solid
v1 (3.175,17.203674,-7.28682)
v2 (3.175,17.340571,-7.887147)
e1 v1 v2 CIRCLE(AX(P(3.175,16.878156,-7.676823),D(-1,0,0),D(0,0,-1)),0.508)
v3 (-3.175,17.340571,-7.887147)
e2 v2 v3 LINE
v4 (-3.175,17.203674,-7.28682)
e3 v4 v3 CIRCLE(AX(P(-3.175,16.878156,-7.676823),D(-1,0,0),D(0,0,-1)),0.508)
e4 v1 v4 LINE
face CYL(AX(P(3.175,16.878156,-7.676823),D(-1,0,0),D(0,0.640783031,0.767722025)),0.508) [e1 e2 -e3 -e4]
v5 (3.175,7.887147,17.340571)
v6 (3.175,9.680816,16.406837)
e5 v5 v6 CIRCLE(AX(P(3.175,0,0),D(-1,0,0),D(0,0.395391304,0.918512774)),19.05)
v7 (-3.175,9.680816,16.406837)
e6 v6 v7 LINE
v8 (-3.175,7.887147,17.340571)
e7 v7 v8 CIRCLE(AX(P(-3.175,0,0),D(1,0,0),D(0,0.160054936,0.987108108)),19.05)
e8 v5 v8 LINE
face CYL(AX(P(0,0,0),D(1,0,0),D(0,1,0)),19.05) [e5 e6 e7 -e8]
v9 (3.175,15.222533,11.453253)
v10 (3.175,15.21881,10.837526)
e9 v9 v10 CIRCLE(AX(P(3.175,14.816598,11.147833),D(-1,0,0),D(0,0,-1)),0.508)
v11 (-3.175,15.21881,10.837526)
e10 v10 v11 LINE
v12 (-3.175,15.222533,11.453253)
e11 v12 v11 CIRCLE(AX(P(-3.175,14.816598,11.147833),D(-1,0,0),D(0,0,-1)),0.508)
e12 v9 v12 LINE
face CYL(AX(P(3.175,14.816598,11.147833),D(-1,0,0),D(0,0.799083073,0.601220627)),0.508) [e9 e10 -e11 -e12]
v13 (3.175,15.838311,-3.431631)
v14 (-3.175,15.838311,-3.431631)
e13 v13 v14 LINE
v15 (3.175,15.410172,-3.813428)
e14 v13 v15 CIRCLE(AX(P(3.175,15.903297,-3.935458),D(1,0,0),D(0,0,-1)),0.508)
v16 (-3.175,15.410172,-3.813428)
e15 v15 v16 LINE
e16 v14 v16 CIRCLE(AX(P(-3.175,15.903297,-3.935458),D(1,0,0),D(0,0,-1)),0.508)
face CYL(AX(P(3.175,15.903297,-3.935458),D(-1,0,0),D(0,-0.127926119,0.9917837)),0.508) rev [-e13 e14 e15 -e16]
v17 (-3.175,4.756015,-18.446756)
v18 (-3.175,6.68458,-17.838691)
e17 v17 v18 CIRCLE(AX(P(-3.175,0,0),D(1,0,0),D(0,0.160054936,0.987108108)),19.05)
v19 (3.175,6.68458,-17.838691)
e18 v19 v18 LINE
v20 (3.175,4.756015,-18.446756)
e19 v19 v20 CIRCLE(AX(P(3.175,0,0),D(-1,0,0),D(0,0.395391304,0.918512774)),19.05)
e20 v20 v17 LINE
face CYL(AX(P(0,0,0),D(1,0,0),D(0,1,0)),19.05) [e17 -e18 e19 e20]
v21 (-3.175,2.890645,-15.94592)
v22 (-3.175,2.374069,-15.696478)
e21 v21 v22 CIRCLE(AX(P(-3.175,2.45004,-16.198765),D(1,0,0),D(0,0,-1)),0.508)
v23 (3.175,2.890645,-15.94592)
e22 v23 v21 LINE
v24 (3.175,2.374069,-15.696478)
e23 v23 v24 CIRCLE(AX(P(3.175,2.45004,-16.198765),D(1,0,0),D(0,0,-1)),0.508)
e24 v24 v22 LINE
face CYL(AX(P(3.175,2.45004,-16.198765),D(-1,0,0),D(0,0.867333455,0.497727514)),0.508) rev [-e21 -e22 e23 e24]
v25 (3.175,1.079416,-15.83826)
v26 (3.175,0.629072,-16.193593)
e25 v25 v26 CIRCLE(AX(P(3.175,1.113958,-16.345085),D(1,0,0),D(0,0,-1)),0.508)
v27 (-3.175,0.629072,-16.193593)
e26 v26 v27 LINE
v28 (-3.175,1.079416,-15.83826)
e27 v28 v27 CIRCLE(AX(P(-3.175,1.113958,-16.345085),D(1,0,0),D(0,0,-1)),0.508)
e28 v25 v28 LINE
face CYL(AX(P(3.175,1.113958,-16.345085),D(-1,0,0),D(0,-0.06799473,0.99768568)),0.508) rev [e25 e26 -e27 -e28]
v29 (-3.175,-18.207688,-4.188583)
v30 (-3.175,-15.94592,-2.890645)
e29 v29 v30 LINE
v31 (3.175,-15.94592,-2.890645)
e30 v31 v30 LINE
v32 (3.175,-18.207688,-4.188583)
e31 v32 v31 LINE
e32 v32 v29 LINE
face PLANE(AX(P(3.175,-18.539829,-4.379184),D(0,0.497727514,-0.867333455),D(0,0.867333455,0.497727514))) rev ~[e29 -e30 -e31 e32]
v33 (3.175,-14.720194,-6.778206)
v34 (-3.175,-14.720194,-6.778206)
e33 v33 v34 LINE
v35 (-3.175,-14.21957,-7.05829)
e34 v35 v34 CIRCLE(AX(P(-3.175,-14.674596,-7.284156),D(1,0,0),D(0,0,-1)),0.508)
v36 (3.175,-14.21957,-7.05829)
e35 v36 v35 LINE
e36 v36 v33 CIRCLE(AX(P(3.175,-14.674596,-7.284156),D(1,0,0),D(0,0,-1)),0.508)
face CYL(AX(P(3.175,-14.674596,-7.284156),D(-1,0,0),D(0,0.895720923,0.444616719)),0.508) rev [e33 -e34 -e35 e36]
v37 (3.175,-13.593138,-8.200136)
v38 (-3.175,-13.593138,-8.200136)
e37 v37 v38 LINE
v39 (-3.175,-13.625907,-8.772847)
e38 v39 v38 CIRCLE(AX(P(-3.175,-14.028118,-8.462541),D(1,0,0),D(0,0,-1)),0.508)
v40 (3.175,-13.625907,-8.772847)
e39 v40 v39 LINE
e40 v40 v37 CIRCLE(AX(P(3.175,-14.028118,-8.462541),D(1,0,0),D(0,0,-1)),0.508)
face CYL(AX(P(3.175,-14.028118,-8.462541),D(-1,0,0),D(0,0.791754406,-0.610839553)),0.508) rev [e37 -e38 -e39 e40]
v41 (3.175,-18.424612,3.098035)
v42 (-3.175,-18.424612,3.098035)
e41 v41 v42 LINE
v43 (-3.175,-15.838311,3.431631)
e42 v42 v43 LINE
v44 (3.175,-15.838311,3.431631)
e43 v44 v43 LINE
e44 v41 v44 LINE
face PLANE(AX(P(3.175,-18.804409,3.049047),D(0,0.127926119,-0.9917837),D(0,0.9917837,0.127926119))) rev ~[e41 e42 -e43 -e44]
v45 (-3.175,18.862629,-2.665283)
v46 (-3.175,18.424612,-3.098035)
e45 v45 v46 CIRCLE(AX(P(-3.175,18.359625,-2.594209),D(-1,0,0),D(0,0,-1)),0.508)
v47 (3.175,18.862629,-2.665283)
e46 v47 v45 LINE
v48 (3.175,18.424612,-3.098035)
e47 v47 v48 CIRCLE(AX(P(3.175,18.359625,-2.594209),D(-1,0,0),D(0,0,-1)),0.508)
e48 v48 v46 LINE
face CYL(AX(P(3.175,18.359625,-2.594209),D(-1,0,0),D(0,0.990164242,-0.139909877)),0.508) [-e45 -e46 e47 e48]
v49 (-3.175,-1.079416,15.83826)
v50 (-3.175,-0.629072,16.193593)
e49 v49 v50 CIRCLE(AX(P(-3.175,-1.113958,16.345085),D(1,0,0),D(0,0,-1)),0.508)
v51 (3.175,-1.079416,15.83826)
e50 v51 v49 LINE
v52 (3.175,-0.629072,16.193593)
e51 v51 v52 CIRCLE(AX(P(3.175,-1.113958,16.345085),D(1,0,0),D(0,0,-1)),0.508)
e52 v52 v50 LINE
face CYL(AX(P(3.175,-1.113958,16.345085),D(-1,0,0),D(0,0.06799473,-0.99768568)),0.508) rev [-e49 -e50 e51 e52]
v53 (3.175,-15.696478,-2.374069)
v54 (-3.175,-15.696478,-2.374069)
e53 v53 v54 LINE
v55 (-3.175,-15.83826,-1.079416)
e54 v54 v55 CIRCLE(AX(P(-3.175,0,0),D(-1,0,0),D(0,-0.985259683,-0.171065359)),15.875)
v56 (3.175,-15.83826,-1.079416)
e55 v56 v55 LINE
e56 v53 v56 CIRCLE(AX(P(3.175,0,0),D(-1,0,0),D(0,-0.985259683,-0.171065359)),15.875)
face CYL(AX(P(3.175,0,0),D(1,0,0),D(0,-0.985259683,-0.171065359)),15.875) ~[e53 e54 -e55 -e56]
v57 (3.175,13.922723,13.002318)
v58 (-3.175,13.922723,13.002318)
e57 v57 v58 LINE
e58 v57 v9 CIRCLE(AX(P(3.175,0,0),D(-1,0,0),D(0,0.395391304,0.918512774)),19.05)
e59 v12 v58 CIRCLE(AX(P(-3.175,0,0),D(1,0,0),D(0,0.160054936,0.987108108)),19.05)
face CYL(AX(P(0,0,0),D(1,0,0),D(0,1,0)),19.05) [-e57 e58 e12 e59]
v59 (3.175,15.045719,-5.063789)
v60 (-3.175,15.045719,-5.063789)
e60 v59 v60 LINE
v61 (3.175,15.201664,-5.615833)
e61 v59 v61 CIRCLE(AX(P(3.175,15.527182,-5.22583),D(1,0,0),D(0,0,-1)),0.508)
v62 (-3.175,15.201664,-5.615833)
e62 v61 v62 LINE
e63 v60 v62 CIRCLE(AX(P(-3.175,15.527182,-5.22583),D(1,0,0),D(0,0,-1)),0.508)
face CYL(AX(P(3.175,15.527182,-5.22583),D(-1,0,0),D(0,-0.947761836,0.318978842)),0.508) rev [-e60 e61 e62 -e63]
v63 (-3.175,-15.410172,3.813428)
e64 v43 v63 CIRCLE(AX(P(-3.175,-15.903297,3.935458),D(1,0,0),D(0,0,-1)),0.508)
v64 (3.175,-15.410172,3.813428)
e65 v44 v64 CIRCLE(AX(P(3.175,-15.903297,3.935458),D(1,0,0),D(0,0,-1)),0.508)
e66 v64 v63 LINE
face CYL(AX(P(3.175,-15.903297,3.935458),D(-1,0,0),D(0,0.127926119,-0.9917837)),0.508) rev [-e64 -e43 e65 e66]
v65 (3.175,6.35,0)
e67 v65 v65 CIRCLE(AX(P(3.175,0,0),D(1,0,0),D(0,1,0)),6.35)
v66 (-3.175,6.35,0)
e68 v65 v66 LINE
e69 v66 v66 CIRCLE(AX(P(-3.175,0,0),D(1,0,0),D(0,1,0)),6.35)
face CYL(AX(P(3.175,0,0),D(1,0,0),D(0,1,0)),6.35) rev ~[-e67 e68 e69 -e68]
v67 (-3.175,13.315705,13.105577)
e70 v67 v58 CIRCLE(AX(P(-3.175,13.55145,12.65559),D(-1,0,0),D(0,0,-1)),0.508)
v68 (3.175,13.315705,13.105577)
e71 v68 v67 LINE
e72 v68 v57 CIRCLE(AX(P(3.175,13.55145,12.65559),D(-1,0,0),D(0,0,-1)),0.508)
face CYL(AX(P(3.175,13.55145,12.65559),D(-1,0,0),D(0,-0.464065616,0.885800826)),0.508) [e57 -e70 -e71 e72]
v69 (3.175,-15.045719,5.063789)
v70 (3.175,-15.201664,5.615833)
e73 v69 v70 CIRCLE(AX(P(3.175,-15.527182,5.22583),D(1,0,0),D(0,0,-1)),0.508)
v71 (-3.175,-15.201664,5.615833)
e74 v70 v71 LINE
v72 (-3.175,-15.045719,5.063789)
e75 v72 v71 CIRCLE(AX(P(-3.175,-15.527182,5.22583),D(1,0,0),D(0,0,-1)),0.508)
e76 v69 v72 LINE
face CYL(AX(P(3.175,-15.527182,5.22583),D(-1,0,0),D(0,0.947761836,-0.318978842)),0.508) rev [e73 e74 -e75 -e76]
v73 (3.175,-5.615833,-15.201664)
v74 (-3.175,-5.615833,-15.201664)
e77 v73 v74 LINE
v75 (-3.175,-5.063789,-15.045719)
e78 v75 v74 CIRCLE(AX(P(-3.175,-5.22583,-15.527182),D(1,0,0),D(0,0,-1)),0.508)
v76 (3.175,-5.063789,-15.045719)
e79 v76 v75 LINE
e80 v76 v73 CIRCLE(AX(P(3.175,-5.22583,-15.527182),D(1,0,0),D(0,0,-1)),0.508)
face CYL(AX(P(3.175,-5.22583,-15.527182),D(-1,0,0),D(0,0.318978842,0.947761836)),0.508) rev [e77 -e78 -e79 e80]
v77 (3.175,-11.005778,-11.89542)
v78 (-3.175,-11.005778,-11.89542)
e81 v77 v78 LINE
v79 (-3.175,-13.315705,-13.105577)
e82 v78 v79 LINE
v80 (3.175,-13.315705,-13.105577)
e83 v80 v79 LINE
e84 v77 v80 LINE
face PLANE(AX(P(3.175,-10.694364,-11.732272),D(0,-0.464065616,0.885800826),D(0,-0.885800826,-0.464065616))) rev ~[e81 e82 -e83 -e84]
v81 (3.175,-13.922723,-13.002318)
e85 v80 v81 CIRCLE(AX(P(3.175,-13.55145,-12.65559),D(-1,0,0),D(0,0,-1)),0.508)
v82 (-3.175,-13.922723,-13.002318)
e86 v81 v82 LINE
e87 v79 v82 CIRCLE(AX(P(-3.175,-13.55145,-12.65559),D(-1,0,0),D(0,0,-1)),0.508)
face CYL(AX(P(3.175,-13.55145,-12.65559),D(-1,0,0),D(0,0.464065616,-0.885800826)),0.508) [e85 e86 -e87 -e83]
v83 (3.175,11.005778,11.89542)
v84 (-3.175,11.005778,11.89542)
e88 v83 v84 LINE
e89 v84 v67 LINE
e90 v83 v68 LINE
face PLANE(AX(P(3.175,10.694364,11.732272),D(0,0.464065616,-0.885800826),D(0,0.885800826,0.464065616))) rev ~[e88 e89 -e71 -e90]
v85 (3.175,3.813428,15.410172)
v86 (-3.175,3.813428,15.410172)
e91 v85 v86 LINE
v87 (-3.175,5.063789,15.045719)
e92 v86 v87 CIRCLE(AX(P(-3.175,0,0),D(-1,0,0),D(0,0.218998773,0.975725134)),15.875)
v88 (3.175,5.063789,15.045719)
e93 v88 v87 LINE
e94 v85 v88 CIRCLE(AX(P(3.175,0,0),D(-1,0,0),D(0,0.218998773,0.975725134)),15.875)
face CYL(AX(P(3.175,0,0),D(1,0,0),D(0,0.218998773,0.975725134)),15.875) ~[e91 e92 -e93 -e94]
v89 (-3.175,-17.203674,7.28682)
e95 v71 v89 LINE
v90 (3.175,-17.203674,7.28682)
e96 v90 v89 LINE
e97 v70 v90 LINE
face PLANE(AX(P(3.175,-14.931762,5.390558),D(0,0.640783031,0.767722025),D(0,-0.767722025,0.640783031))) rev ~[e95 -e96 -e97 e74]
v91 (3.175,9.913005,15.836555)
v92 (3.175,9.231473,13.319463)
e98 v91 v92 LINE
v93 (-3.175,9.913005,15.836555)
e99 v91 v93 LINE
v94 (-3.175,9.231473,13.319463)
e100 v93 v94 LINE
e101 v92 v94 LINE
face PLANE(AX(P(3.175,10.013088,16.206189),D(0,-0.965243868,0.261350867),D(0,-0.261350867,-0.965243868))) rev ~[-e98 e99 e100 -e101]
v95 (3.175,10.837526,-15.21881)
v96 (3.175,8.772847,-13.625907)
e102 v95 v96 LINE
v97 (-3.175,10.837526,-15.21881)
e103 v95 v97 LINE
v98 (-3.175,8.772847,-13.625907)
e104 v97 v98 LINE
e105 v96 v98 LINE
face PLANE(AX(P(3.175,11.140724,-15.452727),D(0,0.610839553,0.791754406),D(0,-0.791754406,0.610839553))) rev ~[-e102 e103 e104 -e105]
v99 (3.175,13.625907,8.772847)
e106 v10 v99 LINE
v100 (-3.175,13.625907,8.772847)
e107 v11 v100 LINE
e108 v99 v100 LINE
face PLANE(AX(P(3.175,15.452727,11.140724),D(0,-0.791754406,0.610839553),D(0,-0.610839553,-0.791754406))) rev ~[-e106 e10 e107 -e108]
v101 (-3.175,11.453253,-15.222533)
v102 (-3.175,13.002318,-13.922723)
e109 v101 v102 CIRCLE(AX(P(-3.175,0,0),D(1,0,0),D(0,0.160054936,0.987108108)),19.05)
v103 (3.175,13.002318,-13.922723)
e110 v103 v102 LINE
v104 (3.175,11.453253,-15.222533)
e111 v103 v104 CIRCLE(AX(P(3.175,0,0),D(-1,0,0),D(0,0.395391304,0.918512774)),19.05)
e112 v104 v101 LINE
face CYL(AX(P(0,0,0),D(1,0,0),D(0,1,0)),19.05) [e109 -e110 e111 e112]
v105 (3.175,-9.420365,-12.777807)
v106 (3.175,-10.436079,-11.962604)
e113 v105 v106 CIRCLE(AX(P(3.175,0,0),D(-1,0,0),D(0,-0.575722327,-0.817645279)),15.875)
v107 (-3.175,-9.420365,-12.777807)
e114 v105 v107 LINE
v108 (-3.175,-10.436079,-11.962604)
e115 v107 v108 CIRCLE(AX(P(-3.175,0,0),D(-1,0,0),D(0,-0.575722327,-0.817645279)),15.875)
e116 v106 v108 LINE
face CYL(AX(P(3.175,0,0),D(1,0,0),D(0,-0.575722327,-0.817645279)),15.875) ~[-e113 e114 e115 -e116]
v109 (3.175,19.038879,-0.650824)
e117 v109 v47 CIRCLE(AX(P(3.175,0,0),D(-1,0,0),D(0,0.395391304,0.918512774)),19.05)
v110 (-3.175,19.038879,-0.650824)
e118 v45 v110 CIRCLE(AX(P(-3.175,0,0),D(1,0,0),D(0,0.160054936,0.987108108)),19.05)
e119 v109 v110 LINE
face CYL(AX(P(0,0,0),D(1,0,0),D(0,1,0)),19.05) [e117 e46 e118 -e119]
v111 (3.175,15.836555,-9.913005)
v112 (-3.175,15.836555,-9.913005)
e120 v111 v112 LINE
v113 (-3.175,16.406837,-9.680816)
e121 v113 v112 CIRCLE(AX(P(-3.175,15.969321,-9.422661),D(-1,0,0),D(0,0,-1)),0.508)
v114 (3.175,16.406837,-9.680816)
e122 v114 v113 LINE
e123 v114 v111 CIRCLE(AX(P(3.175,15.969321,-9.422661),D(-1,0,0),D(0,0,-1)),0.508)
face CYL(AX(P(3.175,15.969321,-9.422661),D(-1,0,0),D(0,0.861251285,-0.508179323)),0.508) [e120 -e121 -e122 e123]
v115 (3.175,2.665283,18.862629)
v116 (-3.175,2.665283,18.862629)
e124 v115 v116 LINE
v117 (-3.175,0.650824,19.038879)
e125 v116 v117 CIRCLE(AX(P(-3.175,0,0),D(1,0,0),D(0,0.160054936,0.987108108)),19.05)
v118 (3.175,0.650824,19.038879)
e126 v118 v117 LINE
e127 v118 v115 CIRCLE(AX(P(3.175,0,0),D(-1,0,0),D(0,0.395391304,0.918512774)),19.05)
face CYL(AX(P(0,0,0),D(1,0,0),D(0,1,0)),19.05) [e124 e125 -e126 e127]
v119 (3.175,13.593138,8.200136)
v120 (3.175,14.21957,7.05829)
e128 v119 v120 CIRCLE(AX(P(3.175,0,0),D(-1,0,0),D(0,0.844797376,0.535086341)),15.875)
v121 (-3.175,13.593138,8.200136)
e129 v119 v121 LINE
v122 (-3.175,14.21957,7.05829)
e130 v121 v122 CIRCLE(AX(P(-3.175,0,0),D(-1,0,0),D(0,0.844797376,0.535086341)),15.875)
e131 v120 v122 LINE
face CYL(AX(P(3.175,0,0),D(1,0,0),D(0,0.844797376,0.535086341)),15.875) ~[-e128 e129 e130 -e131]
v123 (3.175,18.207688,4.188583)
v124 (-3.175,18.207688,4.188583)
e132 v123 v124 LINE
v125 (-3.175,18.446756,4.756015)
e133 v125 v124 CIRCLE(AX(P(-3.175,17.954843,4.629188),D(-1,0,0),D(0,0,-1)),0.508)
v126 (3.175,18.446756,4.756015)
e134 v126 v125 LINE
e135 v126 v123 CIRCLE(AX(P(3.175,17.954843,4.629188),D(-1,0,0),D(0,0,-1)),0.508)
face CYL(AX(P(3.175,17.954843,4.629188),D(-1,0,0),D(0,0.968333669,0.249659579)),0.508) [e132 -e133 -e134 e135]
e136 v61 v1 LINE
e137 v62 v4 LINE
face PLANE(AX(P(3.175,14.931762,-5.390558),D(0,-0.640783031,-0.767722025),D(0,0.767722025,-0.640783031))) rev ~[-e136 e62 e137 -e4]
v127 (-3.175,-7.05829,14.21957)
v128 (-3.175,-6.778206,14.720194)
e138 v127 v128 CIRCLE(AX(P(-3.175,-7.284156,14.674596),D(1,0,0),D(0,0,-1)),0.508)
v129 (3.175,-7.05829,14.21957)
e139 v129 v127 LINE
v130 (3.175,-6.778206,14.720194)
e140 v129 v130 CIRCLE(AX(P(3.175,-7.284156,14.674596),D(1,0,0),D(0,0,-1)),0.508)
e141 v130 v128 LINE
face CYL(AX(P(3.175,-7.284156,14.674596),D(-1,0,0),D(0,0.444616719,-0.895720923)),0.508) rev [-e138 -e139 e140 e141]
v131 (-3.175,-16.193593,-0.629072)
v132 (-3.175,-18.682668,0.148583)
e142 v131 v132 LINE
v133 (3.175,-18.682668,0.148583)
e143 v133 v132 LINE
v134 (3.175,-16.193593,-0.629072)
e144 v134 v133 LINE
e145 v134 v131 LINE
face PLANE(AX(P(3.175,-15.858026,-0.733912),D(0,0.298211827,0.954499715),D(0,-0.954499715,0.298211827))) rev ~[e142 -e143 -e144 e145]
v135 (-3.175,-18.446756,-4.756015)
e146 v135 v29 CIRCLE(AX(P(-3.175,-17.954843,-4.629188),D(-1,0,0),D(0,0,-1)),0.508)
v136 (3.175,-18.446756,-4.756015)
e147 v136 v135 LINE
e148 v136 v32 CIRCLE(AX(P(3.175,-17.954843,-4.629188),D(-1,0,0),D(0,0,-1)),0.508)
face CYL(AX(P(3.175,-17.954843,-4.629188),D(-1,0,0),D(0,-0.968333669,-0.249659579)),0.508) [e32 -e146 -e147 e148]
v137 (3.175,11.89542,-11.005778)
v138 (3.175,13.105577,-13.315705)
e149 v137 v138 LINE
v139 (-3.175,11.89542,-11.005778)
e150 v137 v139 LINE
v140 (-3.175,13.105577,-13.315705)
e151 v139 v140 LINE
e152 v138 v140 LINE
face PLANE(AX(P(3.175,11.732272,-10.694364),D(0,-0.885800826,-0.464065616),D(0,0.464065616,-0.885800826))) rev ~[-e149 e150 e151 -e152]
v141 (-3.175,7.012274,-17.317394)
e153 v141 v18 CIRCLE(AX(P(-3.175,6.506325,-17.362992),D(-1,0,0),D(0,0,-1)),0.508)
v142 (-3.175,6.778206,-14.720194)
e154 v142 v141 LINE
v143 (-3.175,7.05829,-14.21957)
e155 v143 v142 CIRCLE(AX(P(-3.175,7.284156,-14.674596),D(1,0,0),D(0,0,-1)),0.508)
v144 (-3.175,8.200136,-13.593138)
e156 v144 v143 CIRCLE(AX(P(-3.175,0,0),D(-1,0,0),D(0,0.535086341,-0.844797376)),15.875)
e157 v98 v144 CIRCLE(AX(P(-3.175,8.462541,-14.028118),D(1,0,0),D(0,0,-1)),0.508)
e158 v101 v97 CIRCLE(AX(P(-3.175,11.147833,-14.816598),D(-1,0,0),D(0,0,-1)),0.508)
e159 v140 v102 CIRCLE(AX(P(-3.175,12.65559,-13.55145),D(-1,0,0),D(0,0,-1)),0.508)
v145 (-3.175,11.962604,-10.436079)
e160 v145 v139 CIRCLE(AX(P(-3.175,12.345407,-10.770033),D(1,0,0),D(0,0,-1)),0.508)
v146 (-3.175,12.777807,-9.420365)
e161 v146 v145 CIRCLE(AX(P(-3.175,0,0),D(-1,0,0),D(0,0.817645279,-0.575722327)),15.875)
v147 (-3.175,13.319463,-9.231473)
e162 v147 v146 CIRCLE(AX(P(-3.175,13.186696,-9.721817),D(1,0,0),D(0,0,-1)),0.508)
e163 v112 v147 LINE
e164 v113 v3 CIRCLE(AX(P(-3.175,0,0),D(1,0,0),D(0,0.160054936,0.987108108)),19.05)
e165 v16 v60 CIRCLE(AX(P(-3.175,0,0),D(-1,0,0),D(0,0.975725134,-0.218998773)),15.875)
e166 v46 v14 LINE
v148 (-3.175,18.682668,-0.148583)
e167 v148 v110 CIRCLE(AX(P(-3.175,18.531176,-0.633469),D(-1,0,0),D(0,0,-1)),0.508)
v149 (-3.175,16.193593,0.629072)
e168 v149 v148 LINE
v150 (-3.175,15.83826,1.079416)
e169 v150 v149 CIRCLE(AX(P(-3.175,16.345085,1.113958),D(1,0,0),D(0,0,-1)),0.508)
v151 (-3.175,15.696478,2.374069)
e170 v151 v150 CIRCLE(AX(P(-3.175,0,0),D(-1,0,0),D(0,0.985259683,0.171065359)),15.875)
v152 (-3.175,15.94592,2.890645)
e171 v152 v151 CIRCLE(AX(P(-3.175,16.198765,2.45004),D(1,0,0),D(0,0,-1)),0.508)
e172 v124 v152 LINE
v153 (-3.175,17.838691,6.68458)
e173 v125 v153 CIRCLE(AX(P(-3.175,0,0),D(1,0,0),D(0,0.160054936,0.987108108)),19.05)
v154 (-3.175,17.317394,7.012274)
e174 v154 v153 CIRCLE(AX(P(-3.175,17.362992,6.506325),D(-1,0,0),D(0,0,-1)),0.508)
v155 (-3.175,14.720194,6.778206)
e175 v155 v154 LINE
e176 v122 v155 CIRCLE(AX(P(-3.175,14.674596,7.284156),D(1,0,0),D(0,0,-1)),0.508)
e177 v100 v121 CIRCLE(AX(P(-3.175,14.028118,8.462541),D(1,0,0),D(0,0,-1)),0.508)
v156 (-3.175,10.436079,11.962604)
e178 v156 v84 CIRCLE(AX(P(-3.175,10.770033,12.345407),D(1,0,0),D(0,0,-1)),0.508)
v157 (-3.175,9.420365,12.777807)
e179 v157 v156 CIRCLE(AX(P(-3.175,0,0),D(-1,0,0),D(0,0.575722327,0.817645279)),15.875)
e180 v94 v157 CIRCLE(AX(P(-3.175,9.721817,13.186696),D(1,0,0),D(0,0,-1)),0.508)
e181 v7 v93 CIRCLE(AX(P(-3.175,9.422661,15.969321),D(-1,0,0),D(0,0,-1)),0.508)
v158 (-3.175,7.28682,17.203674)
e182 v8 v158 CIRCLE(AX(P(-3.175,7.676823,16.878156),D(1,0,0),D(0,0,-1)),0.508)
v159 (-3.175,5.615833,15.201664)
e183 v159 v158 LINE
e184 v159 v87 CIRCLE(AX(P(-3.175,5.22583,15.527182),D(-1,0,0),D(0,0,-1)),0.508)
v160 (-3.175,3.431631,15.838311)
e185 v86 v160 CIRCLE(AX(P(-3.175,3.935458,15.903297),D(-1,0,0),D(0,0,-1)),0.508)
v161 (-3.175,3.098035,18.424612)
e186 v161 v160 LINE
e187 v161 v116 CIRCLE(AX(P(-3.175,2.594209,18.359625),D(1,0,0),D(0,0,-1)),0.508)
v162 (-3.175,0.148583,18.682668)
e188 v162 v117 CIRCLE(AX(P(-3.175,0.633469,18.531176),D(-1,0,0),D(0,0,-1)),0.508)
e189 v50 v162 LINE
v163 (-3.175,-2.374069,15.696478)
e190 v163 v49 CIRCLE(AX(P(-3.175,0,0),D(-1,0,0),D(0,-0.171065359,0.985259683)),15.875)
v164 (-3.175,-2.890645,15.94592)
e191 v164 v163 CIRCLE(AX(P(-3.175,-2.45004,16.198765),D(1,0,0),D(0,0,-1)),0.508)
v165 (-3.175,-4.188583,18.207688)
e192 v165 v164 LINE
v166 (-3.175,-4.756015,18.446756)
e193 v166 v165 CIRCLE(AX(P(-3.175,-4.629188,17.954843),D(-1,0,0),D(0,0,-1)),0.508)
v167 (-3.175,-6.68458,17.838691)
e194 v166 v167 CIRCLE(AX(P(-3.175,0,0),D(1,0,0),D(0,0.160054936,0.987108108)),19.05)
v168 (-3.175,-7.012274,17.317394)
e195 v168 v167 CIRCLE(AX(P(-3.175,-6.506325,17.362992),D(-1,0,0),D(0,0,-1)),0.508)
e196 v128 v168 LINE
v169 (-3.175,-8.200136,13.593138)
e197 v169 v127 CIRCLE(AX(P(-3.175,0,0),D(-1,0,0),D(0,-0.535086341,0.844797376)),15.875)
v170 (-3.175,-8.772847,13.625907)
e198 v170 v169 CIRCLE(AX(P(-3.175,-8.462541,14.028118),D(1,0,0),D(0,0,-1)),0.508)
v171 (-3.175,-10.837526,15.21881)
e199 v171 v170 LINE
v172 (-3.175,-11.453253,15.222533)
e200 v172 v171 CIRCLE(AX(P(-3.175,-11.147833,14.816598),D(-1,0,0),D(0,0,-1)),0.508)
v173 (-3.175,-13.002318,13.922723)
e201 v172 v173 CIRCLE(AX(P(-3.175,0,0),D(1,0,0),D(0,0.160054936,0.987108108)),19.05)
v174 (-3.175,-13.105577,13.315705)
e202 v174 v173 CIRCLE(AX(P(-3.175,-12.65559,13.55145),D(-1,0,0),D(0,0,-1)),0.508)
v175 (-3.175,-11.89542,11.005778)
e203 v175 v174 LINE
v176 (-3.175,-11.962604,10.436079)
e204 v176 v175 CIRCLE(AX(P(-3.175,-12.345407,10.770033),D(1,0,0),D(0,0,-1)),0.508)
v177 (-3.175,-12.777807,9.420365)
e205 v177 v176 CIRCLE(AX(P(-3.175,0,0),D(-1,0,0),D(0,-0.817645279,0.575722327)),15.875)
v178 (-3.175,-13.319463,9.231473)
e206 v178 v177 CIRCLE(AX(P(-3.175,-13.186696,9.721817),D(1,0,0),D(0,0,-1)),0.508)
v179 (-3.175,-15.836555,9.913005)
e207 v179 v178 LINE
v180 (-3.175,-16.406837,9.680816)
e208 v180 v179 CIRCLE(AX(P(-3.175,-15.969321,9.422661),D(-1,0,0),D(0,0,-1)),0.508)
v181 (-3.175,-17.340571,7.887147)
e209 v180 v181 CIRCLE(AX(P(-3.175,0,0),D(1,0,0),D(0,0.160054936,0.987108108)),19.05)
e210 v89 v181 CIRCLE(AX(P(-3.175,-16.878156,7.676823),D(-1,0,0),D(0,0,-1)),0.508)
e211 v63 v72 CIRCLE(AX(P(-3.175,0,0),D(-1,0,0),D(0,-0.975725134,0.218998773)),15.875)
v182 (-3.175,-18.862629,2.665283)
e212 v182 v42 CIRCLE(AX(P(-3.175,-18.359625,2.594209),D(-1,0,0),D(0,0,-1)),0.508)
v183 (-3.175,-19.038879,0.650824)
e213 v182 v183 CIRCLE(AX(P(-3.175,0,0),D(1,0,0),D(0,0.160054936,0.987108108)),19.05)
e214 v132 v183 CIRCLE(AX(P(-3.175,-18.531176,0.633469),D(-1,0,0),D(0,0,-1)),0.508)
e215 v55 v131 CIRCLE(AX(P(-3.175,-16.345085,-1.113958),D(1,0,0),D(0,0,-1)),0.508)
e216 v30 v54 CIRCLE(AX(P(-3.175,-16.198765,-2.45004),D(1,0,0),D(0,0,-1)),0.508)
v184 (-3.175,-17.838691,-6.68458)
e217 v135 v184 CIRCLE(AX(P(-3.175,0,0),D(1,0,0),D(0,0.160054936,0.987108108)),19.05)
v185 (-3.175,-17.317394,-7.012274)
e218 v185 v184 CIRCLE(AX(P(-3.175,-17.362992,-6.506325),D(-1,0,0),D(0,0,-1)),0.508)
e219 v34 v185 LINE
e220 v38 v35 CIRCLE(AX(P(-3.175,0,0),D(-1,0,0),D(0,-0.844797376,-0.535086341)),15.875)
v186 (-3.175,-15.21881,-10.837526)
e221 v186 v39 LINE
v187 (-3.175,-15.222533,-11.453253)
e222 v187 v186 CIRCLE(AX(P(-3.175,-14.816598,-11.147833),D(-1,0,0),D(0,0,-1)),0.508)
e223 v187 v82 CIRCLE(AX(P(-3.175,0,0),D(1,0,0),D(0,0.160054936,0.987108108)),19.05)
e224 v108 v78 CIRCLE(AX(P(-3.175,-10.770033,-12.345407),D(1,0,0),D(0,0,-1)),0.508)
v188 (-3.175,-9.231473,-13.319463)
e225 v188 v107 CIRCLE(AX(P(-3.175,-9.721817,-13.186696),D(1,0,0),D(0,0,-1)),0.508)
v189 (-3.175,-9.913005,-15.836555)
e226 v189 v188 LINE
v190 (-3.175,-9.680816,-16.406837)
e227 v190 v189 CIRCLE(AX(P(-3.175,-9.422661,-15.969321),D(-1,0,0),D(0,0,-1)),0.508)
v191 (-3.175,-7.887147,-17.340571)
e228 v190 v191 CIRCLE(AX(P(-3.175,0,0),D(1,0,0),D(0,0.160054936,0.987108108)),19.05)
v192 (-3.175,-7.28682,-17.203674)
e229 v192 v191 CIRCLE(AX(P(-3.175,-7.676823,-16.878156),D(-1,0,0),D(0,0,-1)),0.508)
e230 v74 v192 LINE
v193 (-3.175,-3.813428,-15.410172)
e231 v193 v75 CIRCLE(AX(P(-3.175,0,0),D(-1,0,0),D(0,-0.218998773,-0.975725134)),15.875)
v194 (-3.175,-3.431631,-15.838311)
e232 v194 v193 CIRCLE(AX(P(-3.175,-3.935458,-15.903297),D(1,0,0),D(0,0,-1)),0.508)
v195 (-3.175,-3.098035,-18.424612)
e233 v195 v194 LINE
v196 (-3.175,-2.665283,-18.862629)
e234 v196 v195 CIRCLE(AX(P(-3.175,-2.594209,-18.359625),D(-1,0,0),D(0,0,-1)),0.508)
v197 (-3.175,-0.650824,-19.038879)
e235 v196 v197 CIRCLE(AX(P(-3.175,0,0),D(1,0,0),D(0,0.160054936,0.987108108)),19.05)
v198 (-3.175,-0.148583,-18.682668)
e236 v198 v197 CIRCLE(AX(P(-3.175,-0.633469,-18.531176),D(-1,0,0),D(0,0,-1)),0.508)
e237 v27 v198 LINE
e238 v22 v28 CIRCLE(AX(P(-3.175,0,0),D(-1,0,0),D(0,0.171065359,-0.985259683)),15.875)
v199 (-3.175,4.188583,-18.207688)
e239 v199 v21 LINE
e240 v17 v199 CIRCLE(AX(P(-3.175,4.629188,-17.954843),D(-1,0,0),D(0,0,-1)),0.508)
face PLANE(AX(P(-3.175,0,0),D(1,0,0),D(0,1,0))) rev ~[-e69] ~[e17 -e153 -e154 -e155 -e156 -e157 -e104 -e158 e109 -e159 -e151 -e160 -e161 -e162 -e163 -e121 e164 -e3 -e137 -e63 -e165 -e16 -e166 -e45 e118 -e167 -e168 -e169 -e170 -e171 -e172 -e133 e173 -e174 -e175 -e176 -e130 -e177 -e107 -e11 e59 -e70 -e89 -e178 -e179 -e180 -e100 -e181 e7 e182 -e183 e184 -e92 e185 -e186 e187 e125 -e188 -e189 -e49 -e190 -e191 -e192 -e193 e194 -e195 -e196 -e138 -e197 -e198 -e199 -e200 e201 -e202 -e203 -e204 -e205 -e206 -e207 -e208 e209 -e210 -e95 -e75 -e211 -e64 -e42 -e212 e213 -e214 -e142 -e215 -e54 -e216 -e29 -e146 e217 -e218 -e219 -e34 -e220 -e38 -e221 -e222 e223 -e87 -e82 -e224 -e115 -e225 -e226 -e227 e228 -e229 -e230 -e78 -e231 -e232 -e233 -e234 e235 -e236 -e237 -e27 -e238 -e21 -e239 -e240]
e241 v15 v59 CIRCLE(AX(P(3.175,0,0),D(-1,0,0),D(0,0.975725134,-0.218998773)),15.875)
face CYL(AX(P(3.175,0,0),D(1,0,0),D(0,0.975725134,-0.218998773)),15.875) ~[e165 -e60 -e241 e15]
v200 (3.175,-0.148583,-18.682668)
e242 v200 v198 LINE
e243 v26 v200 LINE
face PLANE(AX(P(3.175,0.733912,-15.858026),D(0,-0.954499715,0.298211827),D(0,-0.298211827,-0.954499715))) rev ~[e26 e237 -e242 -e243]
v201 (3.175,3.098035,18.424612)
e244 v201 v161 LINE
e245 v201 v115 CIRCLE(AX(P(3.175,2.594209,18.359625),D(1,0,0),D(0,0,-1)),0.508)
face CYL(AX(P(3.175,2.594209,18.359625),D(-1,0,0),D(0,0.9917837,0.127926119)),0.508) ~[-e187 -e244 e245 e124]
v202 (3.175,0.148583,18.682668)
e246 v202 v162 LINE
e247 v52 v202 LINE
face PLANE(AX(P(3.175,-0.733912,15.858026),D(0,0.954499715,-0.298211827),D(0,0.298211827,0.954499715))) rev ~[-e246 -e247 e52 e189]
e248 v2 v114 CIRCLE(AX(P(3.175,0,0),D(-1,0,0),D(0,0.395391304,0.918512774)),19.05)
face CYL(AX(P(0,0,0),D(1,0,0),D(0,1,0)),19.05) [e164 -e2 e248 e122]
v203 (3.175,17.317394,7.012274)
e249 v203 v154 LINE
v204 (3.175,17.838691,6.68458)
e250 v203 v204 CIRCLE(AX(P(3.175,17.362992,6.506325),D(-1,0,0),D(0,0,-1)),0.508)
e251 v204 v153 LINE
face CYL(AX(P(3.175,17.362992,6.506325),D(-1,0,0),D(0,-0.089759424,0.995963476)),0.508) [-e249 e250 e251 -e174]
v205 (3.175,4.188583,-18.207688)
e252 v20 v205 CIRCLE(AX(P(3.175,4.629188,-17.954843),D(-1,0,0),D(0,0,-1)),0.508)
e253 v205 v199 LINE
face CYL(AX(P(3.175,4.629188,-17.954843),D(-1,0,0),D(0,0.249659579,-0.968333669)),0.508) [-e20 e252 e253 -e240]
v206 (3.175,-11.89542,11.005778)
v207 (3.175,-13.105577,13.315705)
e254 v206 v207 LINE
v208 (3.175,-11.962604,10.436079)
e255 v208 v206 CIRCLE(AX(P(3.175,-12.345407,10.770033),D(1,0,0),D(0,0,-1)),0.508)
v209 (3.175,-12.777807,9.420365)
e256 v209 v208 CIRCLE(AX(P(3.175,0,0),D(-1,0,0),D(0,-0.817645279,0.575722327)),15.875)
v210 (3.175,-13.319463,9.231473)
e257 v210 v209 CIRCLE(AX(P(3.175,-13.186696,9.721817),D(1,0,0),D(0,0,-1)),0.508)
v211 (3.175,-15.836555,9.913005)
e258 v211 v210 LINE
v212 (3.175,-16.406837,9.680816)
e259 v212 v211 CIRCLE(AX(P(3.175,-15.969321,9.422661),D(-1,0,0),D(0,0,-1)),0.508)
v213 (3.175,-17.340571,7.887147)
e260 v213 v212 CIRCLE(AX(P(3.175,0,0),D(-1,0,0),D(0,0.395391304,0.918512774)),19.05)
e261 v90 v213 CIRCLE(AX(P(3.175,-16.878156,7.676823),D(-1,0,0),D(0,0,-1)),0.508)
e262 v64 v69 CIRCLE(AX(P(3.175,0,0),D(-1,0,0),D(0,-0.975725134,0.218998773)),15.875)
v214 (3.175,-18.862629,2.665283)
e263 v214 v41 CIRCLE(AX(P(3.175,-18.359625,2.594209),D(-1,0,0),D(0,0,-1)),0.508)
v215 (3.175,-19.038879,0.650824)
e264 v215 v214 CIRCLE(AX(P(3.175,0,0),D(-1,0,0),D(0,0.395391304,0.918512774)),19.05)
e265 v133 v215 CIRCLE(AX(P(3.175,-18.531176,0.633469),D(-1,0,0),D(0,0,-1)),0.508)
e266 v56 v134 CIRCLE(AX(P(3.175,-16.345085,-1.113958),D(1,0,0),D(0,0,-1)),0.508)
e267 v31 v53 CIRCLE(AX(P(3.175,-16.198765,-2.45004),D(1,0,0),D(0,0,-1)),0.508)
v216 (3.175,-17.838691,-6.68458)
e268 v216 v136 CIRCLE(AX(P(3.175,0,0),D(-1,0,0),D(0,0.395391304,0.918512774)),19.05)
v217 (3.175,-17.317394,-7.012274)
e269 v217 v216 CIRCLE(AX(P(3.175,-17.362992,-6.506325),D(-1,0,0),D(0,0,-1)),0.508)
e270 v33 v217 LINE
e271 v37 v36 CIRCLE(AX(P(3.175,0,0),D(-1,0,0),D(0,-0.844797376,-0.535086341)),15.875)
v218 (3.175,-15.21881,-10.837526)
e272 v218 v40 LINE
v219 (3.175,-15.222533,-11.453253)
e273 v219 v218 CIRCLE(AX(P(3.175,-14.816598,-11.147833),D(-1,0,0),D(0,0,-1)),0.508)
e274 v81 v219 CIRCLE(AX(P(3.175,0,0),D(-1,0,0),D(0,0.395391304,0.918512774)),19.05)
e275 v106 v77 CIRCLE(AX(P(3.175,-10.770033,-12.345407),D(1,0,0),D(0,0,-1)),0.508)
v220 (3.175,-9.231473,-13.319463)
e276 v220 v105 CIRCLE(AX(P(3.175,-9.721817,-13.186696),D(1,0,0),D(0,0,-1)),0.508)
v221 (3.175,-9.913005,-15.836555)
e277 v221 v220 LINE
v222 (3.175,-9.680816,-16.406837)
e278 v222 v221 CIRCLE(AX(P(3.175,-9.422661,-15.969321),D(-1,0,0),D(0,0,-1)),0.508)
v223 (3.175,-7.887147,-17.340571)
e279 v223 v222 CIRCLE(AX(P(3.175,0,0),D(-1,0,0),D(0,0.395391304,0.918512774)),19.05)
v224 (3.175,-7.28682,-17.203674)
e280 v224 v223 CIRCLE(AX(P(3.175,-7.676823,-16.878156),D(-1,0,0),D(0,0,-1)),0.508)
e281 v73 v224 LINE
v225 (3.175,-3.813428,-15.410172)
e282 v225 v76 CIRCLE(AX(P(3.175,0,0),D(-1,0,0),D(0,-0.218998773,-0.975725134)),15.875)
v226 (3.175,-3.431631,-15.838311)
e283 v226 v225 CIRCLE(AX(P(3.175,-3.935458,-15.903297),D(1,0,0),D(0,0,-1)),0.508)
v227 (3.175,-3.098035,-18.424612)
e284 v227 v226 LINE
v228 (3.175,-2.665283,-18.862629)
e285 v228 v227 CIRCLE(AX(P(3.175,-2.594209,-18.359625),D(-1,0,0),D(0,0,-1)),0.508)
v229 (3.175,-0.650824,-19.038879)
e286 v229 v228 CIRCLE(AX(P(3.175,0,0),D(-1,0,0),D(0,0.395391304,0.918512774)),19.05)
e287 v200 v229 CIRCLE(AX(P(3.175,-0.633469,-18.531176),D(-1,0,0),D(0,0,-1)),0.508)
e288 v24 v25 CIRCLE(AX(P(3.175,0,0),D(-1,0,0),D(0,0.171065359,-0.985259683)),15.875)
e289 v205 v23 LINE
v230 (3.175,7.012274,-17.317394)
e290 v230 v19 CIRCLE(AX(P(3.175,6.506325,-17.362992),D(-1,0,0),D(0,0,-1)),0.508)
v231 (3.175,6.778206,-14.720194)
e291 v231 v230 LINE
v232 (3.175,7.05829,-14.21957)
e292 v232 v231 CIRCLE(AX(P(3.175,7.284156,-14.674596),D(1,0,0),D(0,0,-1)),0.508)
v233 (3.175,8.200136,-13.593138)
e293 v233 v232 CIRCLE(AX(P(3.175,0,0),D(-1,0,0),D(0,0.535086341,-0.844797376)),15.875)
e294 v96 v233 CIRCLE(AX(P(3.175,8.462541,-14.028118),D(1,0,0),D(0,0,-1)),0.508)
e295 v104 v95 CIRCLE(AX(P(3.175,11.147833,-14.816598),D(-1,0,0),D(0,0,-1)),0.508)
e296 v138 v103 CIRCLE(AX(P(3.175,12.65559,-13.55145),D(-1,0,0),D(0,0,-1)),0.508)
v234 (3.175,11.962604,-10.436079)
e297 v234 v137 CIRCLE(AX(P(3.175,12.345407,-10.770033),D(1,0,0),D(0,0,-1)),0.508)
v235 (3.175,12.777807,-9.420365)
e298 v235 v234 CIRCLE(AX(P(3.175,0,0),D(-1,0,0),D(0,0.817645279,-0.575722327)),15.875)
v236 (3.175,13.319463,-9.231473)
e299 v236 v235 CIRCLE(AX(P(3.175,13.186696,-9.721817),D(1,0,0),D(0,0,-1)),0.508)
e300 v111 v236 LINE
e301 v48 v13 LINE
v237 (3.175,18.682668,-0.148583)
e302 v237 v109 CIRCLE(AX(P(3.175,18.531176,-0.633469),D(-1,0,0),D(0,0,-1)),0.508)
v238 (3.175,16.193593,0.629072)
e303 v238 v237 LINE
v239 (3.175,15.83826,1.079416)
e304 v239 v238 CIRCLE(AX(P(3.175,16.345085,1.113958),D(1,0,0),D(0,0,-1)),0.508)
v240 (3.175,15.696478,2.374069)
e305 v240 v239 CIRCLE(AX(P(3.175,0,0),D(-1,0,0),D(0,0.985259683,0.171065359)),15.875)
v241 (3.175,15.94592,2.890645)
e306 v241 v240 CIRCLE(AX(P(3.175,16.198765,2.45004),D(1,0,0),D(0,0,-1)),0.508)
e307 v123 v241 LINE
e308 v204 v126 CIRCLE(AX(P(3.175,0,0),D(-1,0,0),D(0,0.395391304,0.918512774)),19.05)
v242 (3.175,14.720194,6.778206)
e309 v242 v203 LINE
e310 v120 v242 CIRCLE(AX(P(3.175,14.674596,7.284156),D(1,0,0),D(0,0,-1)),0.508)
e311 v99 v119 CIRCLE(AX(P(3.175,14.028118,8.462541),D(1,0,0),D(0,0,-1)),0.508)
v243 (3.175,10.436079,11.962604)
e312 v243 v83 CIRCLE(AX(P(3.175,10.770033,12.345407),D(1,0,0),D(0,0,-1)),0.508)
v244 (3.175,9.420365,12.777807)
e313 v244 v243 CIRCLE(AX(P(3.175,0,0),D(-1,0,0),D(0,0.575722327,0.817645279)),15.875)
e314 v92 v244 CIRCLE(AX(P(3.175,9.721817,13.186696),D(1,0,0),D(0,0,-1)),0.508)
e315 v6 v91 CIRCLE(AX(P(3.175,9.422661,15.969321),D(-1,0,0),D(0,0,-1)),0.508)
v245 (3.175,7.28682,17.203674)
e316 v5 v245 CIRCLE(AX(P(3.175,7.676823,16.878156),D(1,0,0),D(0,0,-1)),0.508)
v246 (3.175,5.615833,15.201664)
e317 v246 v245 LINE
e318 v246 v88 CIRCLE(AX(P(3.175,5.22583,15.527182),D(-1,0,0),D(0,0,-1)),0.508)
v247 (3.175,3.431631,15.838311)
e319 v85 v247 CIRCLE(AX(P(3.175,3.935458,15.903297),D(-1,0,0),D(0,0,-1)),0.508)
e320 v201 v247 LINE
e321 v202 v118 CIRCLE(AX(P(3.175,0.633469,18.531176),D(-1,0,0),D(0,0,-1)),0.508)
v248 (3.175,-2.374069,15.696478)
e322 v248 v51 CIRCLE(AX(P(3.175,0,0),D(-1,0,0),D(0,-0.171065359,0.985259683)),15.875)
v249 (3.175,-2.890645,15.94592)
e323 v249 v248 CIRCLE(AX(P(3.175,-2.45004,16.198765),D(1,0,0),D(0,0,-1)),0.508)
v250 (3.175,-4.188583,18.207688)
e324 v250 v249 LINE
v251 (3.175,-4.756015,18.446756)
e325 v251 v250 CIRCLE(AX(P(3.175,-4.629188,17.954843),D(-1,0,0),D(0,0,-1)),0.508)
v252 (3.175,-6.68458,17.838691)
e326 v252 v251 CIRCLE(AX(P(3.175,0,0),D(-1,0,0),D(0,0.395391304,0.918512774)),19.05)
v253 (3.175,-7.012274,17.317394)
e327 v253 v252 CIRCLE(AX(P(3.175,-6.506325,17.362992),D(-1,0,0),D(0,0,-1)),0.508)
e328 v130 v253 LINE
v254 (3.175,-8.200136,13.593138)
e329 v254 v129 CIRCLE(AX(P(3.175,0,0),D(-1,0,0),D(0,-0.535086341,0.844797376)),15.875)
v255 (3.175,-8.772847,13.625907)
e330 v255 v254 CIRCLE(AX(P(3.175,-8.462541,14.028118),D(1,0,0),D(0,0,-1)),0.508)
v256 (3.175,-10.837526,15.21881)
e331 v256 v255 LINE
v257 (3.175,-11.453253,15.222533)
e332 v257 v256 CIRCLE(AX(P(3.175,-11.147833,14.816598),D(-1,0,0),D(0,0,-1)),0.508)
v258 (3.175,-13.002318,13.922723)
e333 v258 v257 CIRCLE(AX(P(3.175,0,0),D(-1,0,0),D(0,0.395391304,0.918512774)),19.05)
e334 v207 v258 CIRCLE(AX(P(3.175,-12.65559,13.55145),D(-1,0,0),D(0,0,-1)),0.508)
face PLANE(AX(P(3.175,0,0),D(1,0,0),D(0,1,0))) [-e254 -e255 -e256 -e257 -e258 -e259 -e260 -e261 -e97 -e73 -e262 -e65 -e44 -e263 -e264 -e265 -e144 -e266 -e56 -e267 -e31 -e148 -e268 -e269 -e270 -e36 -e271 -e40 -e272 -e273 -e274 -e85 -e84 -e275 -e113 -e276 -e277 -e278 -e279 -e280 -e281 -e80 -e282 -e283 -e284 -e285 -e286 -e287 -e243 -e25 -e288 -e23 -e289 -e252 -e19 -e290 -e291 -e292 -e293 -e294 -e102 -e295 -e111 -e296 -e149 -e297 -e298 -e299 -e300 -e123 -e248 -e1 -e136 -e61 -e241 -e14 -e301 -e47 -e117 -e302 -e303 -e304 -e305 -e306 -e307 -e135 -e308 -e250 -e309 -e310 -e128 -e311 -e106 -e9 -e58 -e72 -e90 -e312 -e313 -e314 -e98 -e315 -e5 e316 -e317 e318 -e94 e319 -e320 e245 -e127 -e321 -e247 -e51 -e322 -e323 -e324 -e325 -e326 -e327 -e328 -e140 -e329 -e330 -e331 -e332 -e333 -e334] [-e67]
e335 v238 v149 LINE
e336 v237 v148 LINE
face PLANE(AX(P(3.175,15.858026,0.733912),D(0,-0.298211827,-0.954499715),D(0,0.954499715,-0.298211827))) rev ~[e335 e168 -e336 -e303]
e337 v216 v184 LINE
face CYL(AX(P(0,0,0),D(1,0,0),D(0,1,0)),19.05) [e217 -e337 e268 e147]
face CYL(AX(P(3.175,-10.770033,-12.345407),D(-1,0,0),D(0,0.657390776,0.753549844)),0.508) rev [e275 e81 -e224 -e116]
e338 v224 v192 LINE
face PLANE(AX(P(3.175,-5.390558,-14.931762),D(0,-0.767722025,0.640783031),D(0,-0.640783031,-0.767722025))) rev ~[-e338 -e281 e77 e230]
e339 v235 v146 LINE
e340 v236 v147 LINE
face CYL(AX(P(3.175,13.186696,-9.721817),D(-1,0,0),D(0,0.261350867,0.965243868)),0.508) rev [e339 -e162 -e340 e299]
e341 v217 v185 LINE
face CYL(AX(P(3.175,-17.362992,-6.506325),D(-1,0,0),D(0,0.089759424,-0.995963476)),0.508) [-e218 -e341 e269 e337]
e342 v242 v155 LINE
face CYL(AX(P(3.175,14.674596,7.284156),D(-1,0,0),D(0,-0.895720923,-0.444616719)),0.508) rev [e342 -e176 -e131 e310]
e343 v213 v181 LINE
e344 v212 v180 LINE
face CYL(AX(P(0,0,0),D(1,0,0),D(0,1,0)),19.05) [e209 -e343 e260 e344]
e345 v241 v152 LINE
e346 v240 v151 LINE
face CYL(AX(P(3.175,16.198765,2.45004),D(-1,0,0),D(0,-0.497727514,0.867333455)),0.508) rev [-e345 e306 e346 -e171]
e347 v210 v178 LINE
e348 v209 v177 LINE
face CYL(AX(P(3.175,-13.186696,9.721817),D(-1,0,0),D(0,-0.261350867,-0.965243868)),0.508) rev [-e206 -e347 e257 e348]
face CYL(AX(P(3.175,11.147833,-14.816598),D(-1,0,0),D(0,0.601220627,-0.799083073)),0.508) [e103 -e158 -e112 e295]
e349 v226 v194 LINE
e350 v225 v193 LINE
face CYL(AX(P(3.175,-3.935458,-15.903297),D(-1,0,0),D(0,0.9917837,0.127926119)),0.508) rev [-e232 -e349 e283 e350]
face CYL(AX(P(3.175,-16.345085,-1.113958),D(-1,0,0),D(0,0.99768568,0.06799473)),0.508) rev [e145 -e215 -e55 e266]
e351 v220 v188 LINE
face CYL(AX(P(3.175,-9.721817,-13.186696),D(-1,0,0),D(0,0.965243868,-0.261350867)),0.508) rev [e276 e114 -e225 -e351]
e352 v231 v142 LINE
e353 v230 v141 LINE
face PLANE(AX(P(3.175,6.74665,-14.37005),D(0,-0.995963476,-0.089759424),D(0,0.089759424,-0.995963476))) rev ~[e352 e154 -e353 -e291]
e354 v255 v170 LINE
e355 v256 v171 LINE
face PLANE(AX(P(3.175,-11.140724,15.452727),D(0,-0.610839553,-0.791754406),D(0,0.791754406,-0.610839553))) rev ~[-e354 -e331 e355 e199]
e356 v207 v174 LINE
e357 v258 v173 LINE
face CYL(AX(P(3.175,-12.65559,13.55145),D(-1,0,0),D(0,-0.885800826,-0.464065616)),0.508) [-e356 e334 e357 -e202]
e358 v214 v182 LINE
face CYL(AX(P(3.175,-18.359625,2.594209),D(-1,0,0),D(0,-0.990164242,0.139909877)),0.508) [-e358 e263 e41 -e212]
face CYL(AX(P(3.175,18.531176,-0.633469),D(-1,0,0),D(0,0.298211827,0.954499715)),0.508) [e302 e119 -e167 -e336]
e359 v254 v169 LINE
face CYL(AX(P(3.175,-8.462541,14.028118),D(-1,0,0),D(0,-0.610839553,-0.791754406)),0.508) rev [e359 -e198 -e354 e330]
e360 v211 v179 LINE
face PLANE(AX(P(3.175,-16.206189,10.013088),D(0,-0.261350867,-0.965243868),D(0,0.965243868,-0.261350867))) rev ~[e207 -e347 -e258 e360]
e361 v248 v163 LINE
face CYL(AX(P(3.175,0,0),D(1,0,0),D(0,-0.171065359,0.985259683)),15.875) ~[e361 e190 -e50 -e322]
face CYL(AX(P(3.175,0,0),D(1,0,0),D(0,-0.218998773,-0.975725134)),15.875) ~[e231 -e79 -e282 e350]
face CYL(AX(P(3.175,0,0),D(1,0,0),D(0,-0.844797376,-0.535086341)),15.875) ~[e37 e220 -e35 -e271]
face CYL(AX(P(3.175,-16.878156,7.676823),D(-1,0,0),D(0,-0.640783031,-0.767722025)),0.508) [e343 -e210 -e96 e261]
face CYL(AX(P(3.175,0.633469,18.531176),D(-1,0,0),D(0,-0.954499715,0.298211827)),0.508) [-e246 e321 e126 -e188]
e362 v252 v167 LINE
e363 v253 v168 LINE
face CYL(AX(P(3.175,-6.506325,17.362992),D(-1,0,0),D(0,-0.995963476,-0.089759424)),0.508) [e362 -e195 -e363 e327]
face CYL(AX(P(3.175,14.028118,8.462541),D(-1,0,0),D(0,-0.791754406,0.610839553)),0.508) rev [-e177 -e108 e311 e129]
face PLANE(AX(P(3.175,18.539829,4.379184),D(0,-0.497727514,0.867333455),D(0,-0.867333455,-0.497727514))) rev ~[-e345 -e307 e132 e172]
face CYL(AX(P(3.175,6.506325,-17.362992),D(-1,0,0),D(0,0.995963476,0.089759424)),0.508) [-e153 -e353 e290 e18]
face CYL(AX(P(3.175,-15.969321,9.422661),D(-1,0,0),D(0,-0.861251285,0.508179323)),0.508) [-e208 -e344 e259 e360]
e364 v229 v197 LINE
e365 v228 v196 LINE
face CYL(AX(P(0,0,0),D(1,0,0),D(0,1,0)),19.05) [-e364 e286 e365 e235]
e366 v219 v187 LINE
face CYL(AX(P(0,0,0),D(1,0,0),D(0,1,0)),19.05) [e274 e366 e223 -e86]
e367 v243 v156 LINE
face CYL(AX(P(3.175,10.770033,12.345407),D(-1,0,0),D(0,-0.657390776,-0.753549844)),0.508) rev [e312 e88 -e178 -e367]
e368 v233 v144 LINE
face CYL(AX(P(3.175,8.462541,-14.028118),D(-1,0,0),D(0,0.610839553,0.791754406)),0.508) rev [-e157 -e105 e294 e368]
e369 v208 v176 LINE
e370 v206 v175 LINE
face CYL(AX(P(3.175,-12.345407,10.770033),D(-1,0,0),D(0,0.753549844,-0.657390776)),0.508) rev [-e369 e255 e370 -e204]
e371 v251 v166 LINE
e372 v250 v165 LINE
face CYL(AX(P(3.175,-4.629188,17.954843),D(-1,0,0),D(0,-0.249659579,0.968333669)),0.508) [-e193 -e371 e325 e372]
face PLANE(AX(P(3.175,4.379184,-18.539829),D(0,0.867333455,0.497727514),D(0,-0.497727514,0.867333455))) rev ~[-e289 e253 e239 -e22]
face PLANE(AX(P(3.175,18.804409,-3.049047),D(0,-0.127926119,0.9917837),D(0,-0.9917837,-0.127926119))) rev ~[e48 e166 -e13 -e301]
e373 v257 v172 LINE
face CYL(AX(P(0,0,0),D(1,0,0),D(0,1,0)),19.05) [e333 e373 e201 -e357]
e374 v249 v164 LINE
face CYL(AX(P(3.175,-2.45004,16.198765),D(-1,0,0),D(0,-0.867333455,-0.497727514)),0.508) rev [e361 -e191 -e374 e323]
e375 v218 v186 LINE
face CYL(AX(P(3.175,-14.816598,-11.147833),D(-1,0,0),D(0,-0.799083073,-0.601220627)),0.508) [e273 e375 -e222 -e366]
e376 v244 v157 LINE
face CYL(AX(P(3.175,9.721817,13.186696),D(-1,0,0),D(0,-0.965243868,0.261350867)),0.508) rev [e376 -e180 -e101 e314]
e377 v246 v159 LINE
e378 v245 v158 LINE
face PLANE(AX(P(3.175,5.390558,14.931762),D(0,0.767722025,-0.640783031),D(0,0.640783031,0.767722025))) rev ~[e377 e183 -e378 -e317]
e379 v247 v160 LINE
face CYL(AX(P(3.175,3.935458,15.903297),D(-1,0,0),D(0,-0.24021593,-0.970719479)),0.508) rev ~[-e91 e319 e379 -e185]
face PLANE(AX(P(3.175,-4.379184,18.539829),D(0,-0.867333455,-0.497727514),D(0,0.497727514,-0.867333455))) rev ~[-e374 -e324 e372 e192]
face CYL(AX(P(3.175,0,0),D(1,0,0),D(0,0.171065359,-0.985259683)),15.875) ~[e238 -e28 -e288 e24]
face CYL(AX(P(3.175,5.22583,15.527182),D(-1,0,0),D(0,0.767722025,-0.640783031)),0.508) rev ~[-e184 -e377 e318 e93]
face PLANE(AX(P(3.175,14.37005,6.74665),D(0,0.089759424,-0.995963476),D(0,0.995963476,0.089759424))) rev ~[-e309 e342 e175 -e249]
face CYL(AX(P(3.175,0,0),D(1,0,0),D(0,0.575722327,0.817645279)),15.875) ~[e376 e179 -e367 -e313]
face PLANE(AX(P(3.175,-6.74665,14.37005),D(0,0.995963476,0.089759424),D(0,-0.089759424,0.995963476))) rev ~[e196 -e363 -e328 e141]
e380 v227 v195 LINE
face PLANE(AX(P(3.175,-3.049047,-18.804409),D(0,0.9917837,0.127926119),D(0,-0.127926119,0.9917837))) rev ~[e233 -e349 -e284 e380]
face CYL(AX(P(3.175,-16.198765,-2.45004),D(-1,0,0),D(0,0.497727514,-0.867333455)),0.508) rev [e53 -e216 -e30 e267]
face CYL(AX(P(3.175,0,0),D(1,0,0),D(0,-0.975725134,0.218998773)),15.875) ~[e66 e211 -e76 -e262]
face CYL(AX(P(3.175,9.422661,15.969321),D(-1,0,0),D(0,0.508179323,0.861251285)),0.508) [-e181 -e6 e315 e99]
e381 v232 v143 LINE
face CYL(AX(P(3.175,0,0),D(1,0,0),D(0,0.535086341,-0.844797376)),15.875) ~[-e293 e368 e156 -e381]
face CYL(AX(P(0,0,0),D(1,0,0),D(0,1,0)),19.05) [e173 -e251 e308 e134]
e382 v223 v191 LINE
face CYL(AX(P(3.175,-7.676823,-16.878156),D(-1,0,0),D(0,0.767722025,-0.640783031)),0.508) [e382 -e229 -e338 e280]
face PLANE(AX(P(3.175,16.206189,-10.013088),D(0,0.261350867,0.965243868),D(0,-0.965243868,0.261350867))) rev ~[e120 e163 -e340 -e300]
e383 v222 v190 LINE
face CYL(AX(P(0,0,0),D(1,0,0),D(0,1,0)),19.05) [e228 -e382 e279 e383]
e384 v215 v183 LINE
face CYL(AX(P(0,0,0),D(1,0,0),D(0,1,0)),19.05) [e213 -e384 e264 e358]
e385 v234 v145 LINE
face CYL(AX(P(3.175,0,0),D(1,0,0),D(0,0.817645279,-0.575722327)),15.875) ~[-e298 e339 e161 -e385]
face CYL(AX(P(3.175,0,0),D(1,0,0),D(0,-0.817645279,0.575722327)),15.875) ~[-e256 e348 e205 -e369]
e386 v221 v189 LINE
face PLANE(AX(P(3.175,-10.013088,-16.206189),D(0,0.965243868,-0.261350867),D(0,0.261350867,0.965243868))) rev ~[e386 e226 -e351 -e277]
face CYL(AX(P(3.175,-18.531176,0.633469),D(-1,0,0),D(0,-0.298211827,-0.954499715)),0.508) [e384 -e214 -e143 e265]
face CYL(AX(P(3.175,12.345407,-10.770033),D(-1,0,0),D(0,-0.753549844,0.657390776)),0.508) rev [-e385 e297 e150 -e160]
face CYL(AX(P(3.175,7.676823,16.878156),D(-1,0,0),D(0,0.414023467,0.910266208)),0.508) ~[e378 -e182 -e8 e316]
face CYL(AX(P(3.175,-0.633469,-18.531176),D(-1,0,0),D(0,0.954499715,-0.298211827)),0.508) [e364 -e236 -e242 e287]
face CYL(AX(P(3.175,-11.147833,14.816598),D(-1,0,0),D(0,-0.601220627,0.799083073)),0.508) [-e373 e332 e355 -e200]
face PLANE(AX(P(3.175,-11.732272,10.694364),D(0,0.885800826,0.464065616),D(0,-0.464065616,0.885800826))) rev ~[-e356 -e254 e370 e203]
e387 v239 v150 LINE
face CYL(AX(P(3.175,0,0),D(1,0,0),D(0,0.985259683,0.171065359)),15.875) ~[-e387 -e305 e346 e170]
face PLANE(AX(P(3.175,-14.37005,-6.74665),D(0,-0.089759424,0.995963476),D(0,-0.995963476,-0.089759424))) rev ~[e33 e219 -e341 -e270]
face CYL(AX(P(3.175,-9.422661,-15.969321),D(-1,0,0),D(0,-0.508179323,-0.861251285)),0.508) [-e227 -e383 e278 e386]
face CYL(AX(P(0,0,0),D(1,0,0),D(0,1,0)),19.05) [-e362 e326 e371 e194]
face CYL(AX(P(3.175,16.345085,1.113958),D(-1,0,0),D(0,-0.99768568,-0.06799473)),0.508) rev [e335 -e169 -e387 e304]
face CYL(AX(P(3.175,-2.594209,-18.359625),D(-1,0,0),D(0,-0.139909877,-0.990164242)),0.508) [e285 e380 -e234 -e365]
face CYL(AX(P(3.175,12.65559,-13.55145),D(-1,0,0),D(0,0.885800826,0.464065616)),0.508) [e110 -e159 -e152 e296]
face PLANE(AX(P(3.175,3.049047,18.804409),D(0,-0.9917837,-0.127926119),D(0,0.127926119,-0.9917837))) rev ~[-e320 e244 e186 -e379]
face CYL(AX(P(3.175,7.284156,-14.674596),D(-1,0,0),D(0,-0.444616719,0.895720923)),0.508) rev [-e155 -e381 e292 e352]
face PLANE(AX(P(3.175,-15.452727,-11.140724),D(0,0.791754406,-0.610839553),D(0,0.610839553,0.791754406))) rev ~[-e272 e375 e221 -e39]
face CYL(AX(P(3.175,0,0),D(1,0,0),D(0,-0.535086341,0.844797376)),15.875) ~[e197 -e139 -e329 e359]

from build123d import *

# Parameters (mm, degrees)
F0_R            = 19.05
F1_DEPTH        = 3.175
F3_DEPTH        = 6.35
F3_COPIES_COUNT = 16
F4_R            = 0.508
F5_R            = 6.35
F6_DEPTH        = 6.35


# Not quite as in the source:
# - a pattern or mirror of a feature is missing from the dataset's text; its kind, count and spacing are read off the source's solid


with BuildPart() as f1:
    # F0 (on Right) → F1 (new body, symmetric)
    with BuildSketch(Plane.YZ):
        Circle(F0_R)
    extrude(amount=F1_DEPTH, both=True)

    # F2 (on face) → F3 (cut, through all)
    with BuildSketch(Plane.YZ.offset(3.175)):
        with BuildLine():
            ThreePointArc((7.5322043505, 17.4976683482), (5.7520331342, 19.7340330411), (3.0490465261, 18.8044094638))
            Line((3.0490465261, 18.8044094638), (3.4766055202, 15.489636505))
            ThreePointArc((3.4766055202, 15.489636505), (4.4423475568, 15.2407733788), (5.3905576771, 14.931761883))
            Line((5.3905576771, 14.931761883), (7.5322043505, 17.4976683482))
        make_face()
    f3 = extrude(amount=-F3_DEPTH, mode=Mode.SUBTRACT)

    # F3_copies: F3 ×16 about axis
    f3_copies_axis = Axis((0, 0, 0), (1, 0, 0))
    for i in range(1, F3_COPIES_COUNT):
        add(f3.rotate(f3_copies_axis, i * 360 / F3_COPIES_COUNT), mode=Mode.SUBTRACT)

    # F4
    f4_edges = [f1.edges().sort_by_distance(p)[0] for p in [
        (0, 3.476606, 15.489637),
        (0, 5.390558, 14.931762),
        (0, 3.049047, 18.804409),
        (0, 7.532204, 17.497668),
        (0, 10.013088, 16.206189),
        (0, 9.139592, 12.980119),
        (0, 10.694364, 11.732272),
        (0, 13.654917, 13.283288),
        (0, 15.452727, 11.140724),
        (0, 13.411158, 8.494496),
        (0, 14.37005, 6.74665),
        (0, 17.698793, 7.046647),
        (0, 18.539829, 4.379184),
        (0, 15.640997, 2.715663),
        (0, 15.858026, 0.733912),
        (0, 19.048187, -0.262782),
        (0, 18.804409, -3.049047),
        (0, 15.489637, -3.476606),
        (0, 14.931762, -5.390558),
        (0, 17.497668, -7.532204),
        (0, 16.206189, -10.013088),
        (0, 12.980119, -9.139592),
        (0, 11.732272, -10.694364),
        (0, 13.283288, -13.654917),
        (0, 11.140724, -15.452727),
        (0, 8.494496, -13.411158),
        (0, 6.74665, -14.37005),
        (0, 7.046647, -17.698793),
        (0, 4.379184, -18.539829),
        (0, 2.715663, -15.640997),
        (0, 0.733912, -15.858026),
        (0, -0.262782, -19.048187),
        (0, -3.049047, -18.804409),
        (0, -3.476606, -15.489637),
        (0, -5.390558, -14.931762),
        (0, -7.532204, -17.497668),
        (0, -10.013088, -16.206189),
        (0, -9.139592, -12.980119),
        (0, -10.694364, -11.732272),
        (0, -13.654917, -13.283288),
        (0, -15.452727, -11.140724),
        (0, -13.411158, -8.494496),
        (0, -14.37005, -6.74665),
        (0, -17.698793, -7.046647),
        (0, -18.539829, -4.379184),
        (0, -15.640997, -2.715663),
        (0, -15.858026, -0.733912),
        (0, -19.048187, 0.262782),
        (0, -18.804409, 3.049047),
        (0, -15.489637, 3.476606),
        (0, -14.931762, 5.390558),
        (0, -17.497668, 7.532204),
        (0, -16.206189, 10.013088),
        (0, -12.980119, 9.139592),
        (0, -11.732272, 10.694364),
        (0, -13.283288, 13.654917),
        (0, -11.140724, 15.452727),
        (0, -8.494496, 13.411158),
        (0, -6.74665, 14.37005),
        (0, -7.046647, 17.698793),
        (0, -4.379184, 18.539829),
        (0, -2.715663, 15.640997),
        (0, -0.733912, 15.858026),
        (0, 0.262782, 19.048187),
    ]]
    fillet(f4_edges, radius=F4_R)

    # F5 (on face) → F6 (cut, through all)
    with BuildSketch(Plane.YZ.offset(3.175)):
        Circle(F5_R)
    extrude(amount=-F6_DEPTH, mode=Mode.SUBTRACT)


solid = f1.part
